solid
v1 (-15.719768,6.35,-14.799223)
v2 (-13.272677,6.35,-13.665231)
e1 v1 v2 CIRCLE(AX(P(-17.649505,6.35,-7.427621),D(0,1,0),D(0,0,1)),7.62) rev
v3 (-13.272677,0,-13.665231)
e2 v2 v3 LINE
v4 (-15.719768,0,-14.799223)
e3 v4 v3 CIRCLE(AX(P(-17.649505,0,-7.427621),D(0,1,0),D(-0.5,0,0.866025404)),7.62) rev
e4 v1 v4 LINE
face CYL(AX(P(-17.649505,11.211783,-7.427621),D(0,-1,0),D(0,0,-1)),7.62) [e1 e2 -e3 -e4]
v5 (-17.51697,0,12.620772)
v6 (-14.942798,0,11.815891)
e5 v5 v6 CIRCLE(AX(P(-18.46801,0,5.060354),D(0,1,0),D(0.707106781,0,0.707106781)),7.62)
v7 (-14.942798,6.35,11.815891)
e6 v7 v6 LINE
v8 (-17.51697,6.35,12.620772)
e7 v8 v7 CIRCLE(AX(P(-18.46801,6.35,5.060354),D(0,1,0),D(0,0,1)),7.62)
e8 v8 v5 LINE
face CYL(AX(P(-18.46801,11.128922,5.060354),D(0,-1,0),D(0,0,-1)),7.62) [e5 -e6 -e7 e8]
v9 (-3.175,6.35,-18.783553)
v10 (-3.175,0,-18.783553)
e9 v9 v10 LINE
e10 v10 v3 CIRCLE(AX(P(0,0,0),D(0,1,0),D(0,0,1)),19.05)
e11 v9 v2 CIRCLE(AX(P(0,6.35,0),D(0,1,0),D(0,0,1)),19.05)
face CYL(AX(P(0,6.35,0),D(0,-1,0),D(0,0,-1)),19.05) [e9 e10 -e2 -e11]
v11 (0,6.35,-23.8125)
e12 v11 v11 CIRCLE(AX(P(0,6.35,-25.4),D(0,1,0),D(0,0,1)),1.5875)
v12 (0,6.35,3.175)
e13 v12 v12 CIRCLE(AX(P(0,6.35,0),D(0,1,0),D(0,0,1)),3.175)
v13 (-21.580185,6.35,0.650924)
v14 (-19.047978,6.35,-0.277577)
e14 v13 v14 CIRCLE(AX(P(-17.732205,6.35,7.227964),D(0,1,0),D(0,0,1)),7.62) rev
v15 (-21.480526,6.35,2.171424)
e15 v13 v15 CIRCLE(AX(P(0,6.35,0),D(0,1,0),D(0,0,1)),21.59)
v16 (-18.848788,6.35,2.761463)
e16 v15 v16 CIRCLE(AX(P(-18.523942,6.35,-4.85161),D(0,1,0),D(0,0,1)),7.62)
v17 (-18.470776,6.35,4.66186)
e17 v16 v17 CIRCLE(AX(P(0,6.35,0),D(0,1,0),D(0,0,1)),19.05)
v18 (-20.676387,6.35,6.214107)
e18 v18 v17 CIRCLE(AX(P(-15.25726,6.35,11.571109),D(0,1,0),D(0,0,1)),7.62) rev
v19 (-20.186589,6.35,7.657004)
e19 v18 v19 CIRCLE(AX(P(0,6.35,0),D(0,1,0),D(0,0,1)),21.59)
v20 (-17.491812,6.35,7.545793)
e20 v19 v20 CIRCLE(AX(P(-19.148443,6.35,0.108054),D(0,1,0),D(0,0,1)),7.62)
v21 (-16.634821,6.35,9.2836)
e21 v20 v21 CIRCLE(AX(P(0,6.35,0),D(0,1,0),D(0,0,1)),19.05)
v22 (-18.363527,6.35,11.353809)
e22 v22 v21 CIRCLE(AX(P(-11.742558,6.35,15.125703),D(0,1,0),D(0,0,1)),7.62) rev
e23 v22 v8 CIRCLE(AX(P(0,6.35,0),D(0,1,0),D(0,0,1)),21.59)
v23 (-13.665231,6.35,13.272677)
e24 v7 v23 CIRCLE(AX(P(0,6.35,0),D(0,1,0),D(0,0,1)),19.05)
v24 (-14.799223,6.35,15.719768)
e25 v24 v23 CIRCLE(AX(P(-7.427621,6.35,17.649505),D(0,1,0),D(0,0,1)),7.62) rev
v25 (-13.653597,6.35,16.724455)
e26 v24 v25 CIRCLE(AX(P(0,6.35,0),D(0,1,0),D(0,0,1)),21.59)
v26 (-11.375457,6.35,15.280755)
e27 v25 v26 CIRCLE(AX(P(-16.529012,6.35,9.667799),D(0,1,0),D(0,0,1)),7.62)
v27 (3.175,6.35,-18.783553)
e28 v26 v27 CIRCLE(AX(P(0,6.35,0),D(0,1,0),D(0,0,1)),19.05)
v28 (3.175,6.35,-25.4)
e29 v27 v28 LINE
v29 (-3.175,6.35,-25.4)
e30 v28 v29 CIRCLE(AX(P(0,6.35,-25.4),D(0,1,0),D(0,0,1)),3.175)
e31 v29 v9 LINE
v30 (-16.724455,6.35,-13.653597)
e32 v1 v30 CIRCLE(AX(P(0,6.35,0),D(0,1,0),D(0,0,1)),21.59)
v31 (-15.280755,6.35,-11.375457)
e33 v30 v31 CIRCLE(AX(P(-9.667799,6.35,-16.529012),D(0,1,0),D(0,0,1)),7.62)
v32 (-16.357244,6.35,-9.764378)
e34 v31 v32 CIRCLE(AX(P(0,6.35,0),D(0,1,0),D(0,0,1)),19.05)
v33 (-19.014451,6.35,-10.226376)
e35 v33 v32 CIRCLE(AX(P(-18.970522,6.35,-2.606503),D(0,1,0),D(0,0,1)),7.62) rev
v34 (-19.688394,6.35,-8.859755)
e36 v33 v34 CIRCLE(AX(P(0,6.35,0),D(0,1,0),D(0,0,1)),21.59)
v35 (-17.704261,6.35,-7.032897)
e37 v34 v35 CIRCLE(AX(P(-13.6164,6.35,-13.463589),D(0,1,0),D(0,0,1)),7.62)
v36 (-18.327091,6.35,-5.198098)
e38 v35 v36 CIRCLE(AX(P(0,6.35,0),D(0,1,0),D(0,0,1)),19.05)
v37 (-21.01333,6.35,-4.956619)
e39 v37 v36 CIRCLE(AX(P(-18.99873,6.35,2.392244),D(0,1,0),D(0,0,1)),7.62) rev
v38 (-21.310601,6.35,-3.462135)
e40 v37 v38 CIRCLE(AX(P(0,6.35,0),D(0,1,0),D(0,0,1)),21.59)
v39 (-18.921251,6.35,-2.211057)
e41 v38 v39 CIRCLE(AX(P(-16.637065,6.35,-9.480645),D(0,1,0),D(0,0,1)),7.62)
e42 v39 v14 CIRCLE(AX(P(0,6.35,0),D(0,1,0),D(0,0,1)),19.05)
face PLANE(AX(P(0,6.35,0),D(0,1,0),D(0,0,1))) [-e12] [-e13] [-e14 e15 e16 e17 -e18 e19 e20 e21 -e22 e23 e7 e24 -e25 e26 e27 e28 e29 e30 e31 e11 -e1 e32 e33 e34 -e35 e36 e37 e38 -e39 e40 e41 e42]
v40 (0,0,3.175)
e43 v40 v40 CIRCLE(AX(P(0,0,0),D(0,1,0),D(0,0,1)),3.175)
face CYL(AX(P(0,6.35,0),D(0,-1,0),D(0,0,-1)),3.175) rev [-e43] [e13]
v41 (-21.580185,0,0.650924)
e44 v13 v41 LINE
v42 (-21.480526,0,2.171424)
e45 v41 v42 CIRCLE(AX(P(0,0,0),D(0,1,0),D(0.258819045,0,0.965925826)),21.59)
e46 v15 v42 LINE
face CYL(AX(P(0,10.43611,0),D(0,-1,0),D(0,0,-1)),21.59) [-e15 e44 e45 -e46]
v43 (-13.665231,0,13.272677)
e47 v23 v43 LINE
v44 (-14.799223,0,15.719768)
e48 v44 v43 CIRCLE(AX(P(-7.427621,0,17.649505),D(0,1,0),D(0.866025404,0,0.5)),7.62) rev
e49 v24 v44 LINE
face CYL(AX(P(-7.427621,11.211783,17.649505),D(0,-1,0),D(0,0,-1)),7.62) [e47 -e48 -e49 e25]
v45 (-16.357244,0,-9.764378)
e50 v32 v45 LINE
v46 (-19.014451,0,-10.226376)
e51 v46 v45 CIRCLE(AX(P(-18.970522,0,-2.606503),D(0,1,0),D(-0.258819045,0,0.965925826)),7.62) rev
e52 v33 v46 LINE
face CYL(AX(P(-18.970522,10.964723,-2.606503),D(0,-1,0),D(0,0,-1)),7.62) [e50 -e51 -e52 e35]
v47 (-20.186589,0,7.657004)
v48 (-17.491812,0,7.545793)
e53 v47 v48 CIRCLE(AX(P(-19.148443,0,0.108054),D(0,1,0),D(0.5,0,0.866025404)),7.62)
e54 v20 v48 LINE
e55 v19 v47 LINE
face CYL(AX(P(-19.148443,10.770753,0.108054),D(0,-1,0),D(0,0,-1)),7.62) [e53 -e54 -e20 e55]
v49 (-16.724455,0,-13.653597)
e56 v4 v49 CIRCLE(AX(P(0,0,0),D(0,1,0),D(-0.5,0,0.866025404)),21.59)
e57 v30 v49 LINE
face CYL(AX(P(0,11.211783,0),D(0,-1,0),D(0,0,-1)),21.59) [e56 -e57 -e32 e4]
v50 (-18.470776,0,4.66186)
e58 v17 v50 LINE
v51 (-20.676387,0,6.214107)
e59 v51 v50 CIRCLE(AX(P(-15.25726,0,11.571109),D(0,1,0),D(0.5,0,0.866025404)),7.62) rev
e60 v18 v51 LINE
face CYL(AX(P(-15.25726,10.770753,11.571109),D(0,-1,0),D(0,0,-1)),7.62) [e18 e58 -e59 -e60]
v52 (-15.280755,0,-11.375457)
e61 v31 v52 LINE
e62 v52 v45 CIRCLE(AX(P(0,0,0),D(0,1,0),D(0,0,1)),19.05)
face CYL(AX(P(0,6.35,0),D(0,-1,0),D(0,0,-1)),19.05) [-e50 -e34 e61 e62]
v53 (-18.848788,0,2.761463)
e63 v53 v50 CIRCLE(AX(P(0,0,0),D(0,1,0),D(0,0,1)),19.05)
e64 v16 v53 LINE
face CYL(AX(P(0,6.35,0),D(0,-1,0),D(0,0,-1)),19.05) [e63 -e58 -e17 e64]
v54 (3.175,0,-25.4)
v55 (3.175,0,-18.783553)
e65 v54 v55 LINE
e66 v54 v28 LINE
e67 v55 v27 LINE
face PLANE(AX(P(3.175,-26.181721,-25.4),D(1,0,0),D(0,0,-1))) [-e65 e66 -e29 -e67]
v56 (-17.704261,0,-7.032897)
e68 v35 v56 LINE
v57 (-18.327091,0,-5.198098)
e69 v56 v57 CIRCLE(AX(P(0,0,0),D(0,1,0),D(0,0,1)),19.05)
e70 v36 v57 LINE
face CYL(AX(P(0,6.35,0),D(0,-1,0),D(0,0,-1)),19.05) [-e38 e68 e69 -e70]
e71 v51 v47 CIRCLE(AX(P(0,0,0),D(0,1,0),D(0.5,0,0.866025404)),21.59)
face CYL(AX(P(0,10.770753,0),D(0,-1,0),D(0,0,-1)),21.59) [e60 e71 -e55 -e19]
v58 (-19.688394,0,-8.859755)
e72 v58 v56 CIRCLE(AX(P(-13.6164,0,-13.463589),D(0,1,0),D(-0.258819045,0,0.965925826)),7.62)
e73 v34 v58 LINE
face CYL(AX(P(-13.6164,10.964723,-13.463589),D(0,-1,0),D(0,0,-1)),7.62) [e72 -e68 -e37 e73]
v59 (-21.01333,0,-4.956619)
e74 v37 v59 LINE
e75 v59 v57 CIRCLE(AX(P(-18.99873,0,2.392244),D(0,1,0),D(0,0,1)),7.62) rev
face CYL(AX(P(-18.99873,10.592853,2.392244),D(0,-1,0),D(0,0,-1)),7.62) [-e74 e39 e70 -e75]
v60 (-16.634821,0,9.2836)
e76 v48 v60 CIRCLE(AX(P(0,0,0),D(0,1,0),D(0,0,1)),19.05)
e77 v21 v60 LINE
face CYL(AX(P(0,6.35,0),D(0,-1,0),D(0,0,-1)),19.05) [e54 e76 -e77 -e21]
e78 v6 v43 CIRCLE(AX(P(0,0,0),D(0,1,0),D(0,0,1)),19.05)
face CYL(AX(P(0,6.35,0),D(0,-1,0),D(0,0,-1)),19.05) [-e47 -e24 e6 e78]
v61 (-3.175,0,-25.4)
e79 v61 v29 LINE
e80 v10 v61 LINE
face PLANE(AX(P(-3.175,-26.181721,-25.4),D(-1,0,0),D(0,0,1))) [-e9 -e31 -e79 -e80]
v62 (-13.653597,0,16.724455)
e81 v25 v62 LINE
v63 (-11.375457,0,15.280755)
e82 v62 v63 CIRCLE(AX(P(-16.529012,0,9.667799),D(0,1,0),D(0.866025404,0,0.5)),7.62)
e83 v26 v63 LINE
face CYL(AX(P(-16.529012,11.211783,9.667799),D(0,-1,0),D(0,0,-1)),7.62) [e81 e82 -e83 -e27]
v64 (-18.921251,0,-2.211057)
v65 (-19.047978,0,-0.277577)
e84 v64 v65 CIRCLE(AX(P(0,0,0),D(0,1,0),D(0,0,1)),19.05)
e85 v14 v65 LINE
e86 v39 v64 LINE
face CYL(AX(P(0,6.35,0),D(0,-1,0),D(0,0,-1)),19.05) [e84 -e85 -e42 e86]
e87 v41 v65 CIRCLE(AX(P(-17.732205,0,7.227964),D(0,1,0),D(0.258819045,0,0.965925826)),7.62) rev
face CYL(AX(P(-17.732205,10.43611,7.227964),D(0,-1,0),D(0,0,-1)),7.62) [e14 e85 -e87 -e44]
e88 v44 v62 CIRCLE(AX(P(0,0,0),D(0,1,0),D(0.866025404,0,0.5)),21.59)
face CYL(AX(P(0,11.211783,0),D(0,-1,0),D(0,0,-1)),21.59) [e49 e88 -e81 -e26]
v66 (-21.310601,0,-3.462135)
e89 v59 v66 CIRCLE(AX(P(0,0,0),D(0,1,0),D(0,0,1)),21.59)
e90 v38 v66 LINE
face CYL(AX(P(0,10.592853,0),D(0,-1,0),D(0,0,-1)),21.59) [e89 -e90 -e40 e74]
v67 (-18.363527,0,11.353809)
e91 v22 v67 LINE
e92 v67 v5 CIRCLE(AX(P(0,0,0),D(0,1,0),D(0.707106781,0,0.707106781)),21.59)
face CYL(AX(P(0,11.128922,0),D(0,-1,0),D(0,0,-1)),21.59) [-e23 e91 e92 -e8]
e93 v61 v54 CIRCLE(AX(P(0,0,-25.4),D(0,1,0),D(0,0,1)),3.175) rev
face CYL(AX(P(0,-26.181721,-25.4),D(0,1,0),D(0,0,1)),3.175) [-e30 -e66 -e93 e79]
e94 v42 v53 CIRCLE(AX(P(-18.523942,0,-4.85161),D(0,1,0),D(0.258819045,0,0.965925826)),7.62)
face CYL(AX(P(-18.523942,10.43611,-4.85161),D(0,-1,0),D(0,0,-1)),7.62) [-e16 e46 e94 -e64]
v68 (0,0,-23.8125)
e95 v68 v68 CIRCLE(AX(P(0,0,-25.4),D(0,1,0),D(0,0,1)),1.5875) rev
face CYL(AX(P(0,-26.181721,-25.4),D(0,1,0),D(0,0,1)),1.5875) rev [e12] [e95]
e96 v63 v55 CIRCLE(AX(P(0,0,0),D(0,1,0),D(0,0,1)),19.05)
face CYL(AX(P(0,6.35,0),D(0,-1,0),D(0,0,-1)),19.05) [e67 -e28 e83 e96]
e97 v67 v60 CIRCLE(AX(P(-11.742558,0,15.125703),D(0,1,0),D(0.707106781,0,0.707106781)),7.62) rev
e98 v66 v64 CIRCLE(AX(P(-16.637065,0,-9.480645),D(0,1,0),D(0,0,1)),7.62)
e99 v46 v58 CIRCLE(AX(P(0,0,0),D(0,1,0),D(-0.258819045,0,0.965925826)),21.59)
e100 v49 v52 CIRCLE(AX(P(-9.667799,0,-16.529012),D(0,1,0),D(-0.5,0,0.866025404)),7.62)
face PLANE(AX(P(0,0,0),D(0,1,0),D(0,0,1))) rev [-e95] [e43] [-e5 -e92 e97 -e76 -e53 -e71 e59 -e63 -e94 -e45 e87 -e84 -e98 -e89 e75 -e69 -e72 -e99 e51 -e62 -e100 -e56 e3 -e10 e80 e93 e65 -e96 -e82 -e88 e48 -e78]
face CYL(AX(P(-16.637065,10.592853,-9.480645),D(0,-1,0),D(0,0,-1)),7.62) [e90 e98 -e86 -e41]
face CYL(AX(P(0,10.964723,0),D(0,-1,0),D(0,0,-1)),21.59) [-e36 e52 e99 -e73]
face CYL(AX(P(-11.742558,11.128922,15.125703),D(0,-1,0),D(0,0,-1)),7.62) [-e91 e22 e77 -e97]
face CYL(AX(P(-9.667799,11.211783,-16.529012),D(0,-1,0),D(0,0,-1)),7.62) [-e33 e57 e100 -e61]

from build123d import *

# Parameters (mm, degrees)
SKETCH1_R           = 19.05
SKETCH1_R_2         = 3.175
BOSS_EXTRUDE1_DEPTH = 6.35
BOSS_EXTRUDE3_DEPTH = 6.35
CIRPATTERN2_DEPTH   = 6.35
SKETCH4_R           = 1.5875
BOSS_EXTRUDE4_DEPTH = 6.35


# Read off the part's stored shape, not the designer's step: CirPattern2
with BuildPart() as part:
    # Sketch1 → Boss-Extrude1 (new body)
    with BuildSketch(Plane(origin=(0, 0, 0), x_dir=(1, 0, 0), z_dir=(0, 1, 0))):
        with Locations(Location((0, 0, 0), (0, 0, 270))):
            Circle(SKETCH1_R)
        with Locations(Location((0, 0, 0), (0, 0, 270))):
            Circle(SKETCH1_R_2, mode=Mode.SUBTRACT)
    extrude(amount=BOSS_EXTRUDE1_DEPTH)

    # Sketch3 → Boss-Extrude3 (add)
    with BuildSketch(Plane(origin=(0, 0, 0), x_dir=(1, 0, 0), z_dir=(0, 1, 0))):
        with BuildLine():
            ThreePointArc((-18.32709122, 5.198098444), (-19.680979383, 5.197152008), (-21.013329851, 4.956618665))
            ThreePointArc((-21.013329851, 4.956618665), (-21.175154204, 4.212000052), (-21.310601203, 3.462134657))
            ThreePointArc((-21.310601203, 3.462134657), (-20.171718001, 2.730042376), (-18.921250622, 2.211057413))
            ThreePointArc((-18.921250622, 2.211057413), (-18.683959592, 3.716470634), (-18.32709122, 5.198098444))
        make_face()
    extrude(amount=BOSS_EXTRUDE3_DEPTH)

    # CirPattern2 outline → CirPattern2 (add)
    with BuildSketch(Plane(origin=(0, 0, 0), x_dir=(1, 0, 0), z_dir=(0, 1, 0))):
        with BuildLine():
            ThreePointArc((-17.704260875, 7.032897477), (-17.085425728, 8.425599549), (-16.357243856, 9.764377784))
            ThreePointArc((-16.357243856, 9.764377784), (-17.665244353, 10.113875638), (-19.014450689, 10.226375946))
            ThreePointArc((-19.014450689, 10.226375946), (-19.36348249, 9.549012822), (-19.688393689, 8.859754733))
            ThreePointArc((-19.688393689, 8.859754733), (-18.777796417, 7.857843228), (-17.704260875, 7.032897477))
        make_face()
        with BuildLine():
            ThreePointArc((-15.280755006, 11.375457202), (-14.322548335, 12.560537779), (-13.272677354, 13.665230916))
            ThreePointArc((-13.272677354, 13.665230916), (-14.445652113, 14.341355358), (-15.719768136, 14.799222606))
            ThreePointArc((-15.719768136, 14.799222606), (-16.232221443, 14.235276148), (-16.724454683, 13.653597166))
            ThreePointArc((-16.724454683, 13.653597166), (-16.104199039, 12.450145051), (-15.280755006, 11.375457202))
        make_face()
        with BuildLine():
            ThreePointArc((-11.375457197, -15.280755), (-12.560537774, -14.322548329), (-13.66523091, -13.272677349))
            ThreePointArc((-13.66523091, -13.272677349), (-14.341355358, -14.445652113), (-14.799222606, -15.719768136))
            ThreePointArc((-14.799222606, -15.719768136), (-14.235276148, -16.232221443), (-13.653597166, -16.724454683))
            ThreePointArc((-13.653597166, -16.724454683), (-12.450145051, -16.104199039), (-11.375457197, -15.280755))
        make_face()
        with BuildLine():
            ThreePointArc((-14.942798311, -11.81589093), (-15.839496111, -10.583612937), (-16.634821136, -9.28359982))
            ThreePointArc((-16.634821136, -9.28359982), (-17.59149541, -10.241612555), (-18.363526703, -11.353809363))
            ThreePointArc((-18.363526703, -11.353809363), (-17.95142893, -11.994761331), (-17.516969515, -12.620771728))
            ThreePointArc((-17.516969515, -12.620771728), (-16.193990063, -12.33312711), (-14.942798311, -11.81589093))
        make_face()
        with BuildLine():
            ThreePointArc((-17.491812414, -7.545793421), (-18.039018964, -6.123421813), (-18.470775793, -4.661860306))
            ThreePointArc((-18.470775793, -4.661860306), (-19.642804121, -5.339624026), (-20.676386801, -6.214107244))
            ThreePointArc((-20.676386801, -6.214107244), (-20.444221496, -6.939878056), (-20.18658934, -7.657004037))
            ThreePointArc((-20.18658934, -7.657004037), (-18.834241415, -7.72157295), (-17.491812414, -7.545793421))
        make_face()
        with BuildLine():
            ThreePointArc((-21.580185309, -0.650923987), (-21.543774153, -1.41205356), (-21.480526461, -2.171424174))
            ThreePointArc((-21.480526461, -2.171424174), (-20.190970338, -2.583806354), (-18.84878841, -2.761462559))
            ThreePointArc((-18.84878841, -2.761462559), (-19.009212486, -1.245929612), (-19.047977604, 0.277577285))
            ThreePointArc((-19.047977604, 0.277577285), (-20.355488193, -0.073748943), (-21.580185309, -0.650923987))
        make_face()
    extrude(amount=CIRPATTERN2_DEPTH)

    # Sketch4 → Boss-Extrude4 (add)
    with BuildSketch(Plane(origin=(0, 6.35, 0), x_dir=(1, 0, 0), z_dir=(0, 1, 0))):
        with BuildLine():
            Line((-3.175, 3.175), (3.175, 3.175))
            Line((3.175, 3.175), (3.175, 25.399999902))
            ThreePointArc((3.175, 25.399999902), (0, 28.575), (-3.175, 25.399999902))
            Line((-3.175, 25.399999902), (-3.175, 3.175))
        make_face()
        with Locations(Location((0, 25.4, 0), (0, 0, 270))):
            Circle(SKETCH4_R, mode=Mode.SUBTRACT)
    extrude(amount=-BOSS_EXTRUDE4_DEPTH)


solid = part.part
